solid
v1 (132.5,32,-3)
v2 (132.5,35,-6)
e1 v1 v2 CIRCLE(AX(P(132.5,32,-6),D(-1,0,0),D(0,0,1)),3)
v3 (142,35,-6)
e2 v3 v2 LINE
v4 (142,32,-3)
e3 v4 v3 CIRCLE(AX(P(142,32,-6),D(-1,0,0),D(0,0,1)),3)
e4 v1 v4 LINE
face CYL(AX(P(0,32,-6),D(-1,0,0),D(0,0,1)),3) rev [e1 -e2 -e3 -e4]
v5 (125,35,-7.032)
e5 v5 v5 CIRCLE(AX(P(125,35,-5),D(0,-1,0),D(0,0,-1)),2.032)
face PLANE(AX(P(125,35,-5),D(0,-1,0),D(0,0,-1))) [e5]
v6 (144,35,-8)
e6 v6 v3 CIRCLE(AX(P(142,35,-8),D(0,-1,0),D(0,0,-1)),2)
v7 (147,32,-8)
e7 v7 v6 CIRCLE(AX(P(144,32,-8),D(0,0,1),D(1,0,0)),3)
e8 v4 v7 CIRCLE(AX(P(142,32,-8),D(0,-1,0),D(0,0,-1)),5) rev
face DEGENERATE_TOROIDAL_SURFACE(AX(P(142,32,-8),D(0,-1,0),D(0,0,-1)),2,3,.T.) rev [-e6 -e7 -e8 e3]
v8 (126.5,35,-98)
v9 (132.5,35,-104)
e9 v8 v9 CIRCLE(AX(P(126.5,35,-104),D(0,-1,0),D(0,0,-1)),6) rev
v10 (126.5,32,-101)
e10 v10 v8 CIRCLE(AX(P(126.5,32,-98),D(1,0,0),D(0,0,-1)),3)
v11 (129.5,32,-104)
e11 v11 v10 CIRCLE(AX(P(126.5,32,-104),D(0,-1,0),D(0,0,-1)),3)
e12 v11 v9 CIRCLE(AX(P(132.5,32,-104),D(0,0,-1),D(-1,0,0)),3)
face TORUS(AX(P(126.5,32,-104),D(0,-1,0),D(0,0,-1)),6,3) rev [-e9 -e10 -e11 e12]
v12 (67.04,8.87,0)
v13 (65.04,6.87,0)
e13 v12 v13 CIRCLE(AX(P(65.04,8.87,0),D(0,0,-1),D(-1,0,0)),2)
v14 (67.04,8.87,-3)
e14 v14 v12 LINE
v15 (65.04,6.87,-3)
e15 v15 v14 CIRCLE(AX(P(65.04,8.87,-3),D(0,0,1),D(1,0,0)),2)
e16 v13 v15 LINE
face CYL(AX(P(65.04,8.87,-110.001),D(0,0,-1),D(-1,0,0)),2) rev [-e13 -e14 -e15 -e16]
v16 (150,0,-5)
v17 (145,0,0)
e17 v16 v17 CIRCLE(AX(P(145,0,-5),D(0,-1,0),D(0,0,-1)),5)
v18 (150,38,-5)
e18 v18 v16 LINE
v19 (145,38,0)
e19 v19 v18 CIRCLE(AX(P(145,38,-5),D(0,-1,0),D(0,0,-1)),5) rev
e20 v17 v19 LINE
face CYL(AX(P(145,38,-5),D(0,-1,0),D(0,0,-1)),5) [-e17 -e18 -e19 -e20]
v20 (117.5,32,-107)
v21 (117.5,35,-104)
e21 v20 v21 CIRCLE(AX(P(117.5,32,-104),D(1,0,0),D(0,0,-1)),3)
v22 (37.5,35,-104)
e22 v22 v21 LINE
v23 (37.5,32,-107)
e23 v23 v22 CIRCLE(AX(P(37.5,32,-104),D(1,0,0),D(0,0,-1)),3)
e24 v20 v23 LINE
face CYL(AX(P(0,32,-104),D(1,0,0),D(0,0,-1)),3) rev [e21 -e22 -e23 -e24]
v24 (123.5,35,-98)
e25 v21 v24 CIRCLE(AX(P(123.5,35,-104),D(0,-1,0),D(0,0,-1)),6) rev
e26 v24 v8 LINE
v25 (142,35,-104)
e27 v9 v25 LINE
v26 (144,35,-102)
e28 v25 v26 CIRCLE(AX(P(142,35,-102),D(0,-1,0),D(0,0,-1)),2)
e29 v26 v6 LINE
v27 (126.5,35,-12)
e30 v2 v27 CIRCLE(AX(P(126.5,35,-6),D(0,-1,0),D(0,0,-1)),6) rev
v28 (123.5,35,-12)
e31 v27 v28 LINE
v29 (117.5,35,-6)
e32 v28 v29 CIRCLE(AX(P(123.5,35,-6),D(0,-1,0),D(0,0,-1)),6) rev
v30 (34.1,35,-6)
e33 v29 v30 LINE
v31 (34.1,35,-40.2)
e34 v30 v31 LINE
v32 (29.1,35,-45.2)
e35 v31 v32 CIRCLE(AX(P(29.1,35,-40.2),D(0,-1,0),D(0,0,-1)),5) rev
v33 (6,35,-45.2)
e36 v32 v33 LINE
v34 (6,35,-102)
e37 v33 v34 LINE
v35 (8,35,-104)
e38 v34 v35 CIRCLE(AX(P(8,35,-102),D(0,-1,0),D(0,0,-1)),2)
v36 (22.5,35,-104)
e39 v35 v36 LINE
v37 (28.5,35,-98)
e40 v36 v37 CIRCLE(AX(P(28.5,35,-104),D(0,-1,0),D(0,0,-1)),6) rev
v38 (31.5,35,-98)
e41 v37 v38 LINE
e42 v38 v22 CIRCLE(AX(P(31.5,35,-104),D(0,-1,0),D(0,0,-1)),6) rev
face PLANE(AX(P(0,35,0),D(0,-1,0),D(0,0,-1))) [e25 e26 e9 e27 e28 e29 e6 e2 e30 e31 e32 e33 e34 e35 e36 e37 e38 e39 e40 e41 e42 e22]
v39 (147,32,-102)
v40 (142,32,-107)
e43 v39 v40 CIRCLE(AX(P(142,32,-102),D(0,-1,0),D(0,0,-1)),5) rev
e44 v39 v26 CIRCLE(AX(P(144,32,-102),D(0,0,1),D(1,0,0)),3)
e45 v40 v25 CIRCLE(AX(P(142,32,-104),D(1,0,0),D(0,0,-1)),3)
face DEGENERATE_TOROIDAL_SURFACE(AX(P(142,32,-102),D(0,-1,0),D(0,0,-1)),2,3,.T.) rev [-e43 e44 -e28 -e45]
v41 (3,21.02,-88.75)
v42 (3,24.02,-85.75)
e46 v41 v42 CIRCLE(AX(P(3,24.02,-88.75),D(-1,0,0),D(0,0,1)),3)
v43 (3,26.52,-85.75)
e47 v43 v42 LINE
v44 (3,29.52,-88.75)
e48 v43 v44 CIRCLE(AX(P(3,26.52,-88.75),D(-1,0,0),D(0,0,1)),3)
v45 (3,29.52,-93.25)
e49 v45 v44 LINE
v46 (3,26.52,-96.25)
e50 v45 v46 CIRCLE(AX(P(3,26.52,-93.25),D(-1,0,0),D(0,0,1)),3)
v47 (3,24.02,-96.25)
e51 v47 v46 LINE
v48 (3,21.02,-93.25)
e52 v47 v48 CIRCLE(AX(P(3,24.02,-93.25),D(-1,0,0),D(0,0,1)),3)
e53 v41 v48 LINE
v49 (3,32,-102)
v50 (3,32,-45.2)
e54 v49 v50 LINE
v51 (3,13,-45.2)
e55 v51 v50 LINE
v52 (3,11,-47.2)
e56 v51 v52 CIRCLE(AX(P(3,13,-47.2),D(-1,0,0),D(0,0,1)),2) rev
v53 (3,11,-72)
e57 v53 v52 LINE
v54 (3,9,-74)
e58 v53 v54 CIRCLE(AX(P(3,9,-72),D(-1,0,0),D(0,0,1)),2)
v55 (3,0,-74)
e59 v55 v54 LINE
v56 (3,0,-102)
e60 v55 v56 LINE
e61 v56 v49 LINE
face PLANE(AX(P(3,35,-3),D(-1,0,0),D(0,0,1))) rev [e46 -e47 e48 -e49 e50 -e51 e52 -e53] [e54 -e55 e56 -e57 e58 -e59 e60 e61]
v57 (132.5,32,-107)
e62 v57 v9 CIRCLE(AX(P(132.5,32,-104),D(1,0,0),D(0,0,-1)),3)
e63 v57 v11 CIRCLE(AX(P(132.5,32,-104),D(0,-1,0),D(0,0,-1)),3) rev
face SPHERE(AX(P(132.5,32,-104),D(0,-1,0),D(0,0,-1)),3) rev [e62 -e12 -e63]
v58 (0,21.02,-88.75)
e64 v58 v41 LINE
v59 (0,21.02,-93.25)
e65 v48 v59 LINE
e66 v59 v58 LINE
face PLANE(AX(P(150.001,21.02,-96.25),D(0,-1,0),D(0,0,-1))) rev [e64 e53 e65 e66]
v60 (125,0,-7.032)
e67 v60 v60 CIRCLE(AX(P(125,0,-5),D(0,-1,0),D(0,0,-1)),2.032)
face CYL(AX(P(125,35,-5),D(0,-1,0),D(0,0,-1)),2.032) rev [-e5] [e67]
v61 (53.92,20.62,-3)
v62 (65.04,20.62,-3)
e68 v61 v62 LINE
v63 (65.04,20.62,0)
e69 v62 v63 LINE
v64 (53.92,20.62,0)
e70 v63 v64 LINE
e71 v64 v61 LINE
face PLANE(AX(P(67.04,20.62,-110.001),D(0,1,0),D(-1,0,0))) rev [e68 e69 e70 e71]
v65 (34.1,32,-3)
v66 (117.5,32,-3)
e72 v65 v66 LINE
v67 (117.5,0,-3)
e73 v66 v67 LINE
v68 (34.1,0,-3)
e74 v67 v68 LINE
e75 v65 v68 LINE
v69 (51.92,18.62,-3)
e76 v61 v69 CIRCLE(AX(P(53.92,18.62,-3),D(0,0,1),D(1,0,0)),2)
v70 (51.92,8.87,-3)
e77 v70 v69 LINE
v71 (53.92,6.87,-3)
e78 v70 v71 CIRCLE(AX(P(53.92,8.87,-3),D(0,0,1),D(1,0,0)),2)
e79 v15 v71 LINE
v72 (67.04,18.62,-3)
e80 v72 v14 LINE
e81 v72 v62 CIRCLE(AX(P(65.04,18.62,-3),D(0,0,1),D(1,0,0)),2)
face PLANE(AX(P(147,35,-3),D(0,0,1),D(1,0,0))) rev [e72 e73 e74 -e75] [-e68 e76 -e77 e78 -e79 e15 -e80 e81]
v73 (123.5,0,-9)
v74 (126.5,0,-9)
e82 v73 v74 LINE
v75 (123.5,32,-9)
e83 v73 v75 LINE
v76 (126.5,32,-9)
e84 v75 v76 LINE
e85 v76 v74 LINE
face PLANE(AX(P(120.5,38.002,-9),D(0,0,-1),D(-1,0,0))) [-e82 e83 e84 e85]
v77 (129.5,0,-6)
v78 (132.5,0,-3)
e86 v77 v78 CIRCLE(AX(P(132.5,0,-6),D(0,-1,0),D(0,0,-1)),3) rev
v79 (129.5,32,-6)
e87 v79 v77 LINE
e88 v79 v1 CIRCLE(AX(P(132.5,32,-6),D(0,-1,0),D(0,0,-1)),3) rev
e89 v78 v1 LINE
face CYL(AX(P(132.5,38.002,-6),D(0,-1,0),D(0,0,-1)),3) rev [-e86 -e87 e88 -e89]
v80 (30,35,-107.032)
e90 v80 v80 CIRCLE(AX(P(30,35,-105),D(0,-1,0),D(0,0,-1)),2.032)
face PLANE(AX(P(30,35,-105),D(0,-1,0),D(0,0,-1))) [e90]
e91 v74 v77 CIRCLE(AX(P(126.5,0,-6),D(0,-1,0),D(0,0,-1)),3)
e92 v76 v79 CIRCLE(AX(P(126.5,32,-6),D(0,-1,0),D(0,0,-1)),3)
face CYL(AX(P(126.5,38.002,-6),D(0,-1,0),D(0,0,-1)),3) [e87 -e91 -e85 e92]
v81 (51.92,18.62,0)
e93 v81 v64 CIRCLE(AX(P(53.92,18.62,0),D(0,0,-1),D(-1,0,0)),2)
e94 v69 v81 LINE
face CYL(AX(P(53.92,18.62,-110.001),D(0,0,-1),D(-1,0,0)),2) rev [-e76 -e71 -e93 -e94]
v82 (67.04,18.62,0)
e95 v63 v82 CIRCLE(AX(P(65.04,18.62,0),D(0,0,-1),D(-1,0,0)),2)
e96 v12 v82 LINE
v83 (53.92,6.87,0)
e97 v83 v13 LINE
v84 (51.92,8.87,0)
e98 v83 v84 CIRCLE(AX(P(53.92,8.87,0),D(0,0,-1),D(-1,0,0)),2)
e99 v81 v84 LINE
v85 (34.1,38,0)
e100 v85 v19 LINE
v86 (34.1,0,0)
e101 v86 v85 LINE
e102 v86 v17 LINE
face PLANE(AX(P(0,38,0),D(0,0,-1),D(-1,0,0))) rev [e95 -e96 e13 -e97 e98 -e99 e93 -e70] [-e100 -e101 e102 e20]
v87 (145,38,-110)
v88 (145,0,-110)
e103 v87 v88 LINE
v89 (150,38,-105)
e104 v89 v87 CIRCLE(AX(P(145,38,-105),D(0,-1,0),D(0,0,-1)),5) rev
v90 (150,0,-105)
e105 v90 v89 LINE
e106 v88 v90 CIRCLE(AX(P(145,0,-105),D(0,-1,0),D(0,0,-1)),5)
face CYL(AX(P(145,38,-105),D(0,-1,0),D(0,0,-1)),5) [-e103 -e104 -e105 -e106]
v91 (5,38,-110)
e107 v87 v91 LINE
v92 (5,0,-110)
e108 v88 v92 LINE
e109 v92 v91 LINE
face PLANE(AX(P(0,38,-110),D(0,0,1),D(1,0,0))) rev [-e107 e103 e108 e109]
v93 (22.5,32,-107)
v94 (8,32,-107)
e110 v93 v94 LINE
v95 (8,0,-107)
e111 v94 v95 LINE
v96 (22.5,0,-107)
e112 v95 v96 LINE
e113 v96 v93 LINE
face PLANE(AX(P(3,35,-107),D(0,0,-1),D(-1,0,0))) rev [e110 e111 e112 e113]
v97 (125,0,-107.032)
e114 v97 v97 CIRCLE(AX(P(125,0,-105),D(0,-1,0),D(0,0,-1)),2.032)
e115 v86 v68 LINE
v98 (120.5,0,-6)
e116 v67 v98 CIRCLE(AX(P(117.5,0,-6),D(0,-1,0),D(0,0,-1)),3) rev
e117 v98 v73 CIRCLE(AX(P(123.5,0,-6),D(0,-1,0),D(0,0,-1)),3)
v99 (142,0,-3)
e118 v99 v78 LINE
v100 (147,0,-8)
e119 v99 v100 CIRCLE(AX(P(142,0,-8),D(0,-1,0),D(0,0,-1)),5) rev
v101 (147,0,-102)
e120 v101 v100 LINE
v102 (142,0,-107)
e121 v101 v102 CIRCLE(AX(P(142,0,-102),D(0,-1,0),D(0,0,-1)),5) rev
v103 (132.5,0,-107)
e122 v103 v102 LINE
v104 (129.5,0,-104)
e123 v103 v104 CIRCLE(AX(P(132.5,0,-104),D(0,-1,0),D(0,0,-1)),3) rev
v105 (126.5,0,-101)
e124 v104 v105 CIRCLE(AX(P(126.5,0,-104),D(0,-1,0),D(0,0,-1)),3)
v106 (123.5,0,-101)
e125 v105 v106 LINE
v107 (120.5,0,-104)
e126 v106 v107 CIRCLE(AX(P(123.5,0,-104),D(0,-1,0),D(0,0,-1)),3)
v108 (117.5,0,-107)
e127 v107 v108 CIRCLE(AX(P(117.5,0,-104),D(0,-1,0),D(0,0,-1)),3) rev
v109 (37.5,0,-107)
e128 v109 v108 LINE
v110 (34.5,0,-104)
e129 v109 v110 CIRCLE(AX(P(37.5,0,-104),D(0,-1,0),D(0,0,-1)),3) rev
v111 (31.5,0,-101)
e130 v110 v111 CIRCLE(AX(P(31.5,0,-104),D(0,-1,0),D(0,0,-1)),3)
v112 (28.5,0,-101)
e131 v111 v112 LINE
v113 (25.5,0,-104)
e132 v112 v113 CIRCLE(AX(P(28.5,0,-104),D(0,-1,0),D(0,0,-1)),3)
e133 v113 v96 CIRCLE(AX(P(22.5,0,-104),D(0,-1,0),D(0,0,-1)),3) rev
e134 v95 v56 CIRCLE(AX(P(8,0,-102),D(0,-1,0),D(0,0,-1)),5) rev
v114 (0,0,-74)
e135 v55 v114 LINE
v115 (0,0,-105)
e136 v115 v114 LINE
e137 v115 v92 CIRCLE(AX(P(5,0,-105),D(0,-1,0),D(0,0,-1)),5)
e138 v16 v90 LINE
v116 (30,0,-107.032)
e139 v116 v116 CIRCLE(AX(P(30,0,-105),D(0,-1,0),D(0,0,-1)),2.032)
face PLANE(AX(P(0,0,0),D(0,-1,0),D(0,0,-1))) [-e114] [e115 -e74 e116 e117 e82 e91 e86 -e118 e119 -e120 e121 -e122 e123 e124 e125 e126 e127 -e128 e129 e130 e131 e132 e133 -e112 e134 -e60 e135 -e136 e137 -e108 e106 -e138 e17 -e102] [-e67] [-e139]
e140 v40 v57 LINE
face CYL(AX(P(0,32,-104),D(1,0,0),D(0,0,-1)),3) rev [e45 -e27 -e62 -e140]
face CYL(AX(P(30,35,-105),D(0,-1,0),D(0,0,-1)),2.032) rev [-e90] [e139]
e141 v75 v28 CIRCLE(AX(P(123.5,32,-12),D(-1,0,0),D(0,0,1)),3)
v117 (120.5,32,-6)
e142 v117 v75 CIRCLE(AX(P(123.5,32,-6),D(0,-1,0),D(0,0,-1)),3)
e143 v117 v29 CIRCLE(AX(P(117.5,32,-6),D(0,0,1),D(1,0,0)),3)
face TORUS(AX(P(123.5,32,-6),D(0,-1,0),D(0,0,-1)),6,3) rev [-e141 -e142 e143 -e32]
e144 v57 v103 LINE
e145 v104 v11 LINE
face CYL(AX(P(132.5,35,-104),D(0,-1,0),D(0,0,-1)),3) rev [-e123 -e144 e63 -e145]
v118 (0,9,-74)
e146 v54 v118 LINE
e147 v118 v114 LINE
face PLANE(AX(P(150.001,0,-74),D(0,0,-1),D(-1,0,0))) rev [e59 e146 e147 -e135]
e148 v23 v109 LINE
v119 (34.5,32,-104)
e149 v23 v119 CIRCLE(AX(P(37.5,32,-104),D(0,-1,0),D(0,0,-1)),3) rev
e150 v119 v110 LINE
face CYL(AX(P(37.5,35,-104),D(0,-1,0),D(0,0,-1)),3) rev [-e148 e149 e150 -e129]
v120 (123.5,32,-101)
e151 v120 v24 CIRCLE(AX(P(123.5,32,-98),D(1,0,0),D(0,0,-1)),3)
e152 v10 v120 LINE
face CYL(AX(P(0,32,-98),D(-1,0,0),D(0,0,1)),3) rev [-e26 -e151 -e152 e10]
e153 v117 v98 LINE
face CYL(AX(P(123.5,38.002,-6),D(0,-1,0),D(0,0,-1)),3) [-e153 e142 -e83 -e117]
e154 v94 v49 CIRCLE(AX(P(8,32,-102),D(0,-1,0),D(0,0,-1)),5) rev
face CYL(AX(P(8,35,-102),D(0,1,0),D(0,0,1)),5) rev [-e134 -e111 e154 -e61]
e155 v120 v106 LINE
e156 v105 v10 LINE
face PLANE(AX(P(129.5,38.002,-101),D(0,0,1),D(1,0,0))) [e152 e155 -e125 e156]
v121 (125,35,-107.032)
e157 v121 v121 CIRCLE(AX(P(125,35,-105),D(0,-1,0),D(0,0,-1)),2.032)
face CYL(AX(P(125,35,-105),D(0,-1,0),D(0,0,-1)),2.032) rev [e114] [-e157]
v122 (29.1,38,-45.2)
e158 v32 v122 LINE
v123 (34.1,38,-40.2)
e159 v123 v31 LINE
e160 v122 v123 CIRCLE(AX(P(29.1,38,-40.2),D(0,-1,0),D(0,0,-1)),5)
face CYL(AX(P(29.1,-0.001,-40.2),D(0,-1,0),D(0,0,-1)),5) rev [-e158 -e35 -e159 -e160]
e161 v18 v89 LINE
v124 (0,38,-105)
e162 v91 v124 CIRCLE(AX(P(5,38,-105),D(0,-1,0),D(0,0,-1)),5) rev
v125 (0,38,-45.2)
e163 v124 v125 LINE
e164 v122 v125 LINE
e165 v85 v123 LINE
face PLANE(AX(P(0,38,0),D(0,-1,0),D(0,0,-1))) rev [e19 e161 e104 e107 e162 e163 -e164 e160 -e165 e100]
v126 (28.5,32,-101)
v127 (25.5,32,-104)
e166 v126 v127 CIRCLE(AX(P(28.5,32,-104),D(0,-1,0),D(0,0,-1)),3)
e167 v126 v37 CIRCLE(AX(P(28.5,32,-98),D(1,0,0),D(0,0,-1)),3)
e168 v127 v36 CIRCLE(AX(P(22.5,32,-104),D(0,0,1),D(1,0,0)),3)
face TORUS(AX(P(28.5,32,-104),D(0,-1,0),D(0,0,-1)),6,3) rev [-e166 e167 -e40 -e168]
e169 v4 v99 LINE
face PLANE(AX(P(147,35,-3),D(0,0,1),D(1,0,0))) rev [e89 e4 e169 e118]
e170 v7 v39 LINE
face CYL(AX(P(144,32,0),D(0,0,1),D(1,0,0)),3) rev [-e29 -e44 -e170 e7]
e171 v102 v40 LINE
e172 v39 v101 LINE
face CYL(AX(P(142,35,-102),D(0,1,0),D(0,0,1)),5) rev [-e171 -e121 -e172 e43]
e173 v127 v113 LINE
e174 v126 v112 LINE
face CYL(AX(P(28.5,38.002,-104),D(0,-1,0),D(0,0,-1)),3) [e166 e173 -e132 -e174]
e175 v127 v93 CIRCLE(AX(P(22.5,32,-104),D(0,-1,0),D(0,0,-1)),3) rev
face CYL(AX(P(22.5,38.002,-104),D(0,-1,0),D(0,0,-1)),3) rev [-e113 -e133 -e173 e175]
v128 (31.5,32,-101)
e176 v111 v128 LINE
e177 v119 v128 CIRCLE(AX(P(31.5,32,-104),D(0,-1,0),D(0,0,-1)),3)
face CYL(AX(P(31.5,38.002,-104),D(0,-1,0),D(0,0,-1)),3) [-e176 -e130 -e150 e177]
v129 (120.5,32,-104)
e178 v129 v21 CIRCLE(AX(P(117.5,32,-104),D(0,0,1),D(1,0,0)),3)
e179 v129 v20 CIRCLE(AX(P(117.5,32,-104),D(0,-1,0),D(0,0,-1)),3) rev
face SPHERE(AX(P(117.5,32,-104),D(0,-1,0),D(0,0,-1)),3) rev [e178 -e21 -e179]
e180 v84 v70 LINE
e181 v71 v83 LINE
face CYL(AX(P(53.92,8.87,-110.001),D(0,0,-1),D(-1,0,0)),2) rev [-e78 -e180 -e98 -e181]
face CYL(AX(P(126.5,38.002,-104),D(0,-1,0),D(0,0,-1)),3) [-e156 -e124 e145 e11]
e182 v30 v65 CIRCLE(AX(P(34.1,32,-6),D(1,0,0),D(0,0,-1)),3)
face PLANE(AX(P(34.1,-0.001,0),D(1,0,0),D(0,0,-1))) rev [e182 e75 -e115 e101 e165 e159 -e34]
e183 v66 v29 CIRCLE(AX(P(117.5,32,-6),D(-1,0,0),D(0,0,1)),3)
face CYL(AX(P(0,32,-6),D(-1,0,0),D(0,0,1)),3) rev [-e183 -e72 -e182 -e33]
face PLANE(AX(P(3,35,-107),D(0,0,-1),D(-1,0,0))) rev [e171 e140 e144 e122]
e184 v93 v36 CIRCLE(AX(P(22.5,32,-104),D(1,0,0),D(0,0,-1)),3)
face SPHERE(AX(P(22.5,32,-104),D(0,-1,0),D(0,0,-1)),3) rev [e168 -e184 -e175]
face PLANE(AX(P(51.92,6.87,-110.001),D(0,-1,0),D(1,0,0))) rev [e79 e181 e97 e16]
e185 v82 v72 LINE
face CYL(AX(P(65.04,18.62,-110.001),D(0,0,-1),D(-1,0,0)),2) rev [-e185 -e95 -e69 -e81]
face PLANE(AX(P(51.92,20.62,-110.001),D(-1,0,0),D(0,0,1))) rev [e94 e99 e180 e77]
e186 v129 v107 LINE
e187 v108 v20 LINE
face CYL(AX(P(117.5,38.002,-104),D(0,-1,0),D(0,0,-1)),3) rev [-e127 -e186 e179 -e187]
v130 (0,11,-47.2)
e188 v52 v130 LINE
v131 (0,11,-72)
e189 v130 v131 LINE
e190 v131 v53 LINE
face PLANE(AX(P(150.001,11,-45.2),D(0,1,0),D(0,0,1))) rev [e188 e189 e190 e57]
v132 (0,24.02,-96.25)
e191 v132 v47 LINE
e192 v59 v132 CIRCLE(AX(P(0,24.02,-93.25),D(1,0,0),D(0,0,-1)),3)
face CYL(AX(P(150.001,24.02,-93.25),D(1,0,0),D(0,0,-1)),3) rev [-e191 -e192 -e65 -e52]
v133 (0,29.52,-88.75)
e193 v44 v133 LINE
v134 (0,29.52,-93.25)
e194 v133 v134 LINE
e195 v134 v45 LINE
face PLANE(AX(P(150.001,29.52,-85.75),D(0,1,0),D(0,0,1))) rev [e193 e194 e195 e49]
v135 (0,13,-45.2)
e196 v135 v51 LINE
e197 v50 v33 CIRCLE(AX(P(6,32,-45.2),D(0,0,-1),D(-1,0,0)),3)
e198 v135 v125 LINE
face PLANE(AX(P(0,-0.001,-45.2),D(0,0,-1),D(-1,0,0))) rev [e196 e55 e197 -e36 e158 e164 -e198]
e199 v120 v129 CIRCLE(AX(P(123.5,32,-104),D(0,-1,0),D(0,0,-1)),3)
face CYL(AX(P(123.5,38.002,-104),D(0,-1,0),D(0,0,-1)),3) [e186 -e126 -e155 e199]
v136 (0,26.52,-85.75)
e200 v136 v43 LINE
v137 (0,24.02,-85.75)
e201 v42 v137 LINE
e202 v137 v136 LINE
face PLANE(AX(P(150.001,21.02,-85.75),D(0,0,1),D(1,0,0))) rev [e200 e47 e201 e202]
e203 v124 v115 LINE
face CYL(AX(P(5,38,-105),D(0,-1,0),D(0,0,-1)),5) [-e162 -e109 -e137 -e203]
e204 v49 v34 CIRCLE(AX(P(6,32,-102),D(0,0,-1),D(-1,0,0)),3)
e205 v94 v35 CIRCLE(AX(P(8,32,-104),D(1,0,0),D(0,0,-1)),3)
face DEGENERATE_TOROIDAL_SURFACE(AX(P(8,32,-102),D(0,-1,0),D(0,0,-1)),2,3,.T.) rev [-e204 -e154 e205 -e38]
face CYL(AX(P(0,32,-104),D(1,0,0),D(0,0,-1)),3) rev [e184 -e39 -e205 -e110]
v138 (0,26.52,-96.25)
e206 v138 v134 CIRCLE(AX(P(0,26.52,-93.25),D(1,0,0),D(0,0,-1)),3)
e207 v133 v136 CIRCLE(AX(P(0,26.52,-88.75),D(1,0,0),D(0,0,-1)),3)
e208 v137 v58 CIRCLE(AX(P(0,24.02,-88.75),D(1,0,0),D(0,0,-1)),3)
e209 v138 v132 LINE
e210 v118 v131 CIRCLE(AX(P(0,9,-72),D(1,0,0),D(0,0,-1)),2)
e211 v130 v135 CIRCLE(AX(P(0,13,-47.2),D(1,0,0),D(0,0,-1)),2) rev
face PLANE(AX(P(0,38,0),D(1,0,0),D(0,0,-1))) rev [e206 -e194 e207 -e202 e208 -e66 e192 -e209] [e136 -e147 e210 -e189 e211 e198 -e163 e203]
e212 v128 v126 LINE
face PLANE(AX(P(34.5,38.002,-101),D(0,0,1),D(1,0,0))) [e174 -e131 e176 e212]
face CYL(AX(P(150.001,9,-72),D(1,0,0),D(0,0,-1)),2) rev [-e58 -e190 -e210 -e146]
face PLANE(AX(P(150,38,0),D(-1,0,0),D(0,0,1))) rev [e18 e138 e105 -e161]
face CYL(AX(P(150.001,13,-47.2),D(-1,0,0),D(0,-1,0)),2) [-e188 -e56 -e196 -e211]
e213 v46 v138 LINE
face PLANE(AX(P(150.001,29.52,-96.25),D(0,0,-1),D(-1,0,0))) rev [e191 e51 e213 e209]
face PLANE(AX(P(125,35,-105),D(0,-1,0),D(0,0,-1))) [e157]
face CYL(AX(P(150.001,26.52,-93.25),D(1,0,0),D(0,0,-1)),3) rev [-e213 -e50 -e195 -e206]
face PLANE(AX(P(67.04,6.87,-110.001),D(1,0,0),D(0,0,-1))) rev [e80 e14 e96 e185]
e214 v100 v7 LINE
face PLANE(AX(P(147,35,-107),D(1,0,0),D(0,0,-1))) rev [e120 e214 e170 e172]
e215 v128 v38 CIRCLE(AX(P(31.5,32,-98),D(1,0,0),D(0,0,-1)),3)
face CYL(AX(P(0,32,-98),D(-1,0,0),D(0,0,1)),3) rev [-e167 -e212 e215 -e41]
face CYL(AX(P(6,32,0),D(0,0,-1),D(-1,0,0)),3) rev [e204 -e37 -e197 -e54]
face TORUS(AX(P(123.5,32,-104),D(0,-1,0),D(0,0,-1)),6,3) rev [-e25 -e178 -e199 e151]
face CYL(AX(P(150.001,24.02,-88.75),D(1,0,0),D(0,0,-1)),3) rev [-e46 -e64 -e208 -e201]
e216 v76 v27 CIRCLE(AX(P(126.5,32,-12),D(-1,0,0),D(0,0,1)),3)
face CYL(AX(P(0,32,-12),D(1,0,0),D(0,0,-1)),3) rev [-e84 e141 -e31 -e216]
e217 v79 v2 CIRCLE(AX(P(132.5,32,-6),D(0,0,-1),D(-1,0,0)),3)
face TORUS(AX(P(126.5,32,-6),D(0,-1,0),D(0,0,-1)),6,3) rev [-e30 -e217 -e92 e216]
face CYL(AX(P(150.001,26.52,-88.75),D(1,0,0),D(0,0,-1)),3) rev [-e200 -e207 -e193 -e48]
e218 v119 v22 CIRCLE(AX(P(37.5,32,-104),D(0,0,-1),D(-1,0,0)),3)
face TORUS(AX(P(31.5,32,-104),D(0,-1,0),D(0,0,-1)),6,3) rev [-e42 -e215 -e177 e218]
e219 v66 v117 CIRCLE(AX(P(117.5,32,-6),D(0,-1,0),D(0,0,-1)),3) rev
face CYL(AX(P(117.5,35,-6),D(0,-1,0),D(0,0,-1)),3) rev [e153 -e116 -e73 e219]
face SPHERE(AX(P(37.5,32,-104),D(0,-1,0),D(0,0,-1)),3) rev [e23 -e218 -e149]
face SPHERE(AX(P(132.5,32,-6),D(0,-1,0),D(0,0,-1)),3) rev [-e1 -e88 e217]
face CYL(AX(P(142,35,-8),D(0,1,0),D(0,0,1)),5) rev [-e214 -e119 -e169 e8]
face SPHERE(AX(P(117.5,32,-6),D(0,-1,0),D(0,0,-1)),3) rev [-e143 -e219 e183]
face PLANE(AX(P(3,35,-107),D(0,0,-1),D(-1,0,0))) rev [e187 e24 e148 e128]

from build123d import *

# Parameters (mm, degrees)
SKETCH1_W           = 150
SKETCH1_H           = 110
BOSS_EXTRUDE1_DEPTH = 38
SKETCH3_W           = 144
SKETCH3_H           = 104
CUT_EXTRUDE1_DEPTH  = 35
CUT_EXTRUDE2_REACH  = 191.853
SKETCH5_W           = 10.5
SKETCH5_H           = 8.5
FILLET4_R           = 3
CUT_EXTRUDE3_REACH  = 191.853
SKETCH6_W           = 34.1
SKETCH6_H           = 45.2
CUT_EXTRUDE4_REACH  = 191.853
SKETCH10_W          = 15.12
SKETCH10_H          = 13.75
FILLET5_R           = 2
BOSS_EXTRUDE2_REACH = 191.853
SKETCH12_W          = 9
SKETCH12_H          = 6
SKETCH13_R          = 2.032
CUT_EXTRUDE5_DEPTH  = 35
CUT_EXTRUDE6_REACH  = 191.853
SKETCH14_W          = 28.8
SKETCH14_H          = 11
FILLET6_R           = 5
FILLET7_R           = 2
FILLET8_DEPTH       = 35
FILLET8_2_DEPTH     = 36
FILLET9_R           = 3


with BuildPart() as part:
    # Sketch1 → Boss-Extrude1 (new body)
    with BuildSketch(Plane(origin=(0, 0, 0), x_dir=(1, 0, 0), z_dir=(0, 1, 0))):
        with Locations((75, 55)):
            Rectangle(SKETCH1_W, SKETCH1_H)
    extrude(amount=BOSS_EXTRUDE1_DEPTH)

    # Sketch3 → Cut-Extrude1 (cut)
    with BuildSketch(Plane.XZ):
        with Locations((75, -55)):
            Rectangle(SKETCH3_W, SKETCH3_H)
    extrude(amount=-CUT_EXTRUDE1_DEPTH, mode=Mode.SUBTRACT)

    # Sketch5 → Cut-Extrude2 (cut, up to next)
    with BuildSketch(Plane.ZY, mode=Mode.PRIVATE) as cut_extrude2_sk1:
        with Locations((-91, 25.27)):
            Rectangle(SKETCH5_W, SKETCH5_H)
    cut_extrude2_tool1 = extrude(cut_extrude2_sk1.sketch, amount=-CUT_EXTRUDE2_REACH, mode=Mode.PRIVATE) & part.part
    add(cut_extrude2_tool1.solids().sort_by_distance((0, 25.27, -91))[0], mode=Mode.SUBTRACT)

    # Fillet4
    fillet4_edges = [part.edges().sort_by_distance(p)[0] for p in [
        (1.5, 21.02, -85.75),
        (1.5, 29.52, -85.75),
        (1.5, 29.52, -96.25),
        (1.5, 21.02, -96.25),
    ]]
    fillet(fillet4_edges, radius=FILLET4_R)

    # Sketch6 → Cut-Extrude3 (cut, up to next)
    with BuildSketch(Plane(origin=(0, 38, 0), x_dir=(1, 0, 0), z_dir=(0, 1, 0)), mode=Mode.PRIVATE) as cut_extrude3_sk1:
        with Locations((17.05, 22.6)):
            Rectangle(SKETCH6_W, SKETCH6_H)
    cut_extrude3_tool1 = extrude(cut_extrude3_sk1.sketch, amount=-CUT_EXTRUDE3_REACH, mode=Mode.PRIVATE) & part.part
    add(cut_extrude3_tool1.solids().sort_by_distance((17.05, 38, -22.6))[0], mode=Mode.SUBTRACT)

    # Sketch10 → Cut-Extrude4 (cut, up to next)
    with BuildSketch(Plane.XY, mode=Mode.PRIVATE) as cut_extrude4_sk1:
        with Locations((59.48, 13.745)):
            Rectangle(SKETCH10_W, SKETCH10_H)
    cut_extrude4_tool1 = extrude(cut_extrude4_sk1.sketch, amount=-CUT_EXTRUDE4_REACH, mode=Mode.PRIVATE) & part.part
    add(cut_extrude4_tool1.solids().sort_by_distance((59.48, 13.745, 0))[0], mode=Mode.SUBTRACT)

    # Fillet5
    fillet5_edges = [part.edges().sort_by_distance(p)[0] for p in [
        (51.92, 6.87, -1.5),
        (51.92, 20.62, -1.5),
        (67.04, 20.62, -1.5),
        (67.04, 6.87, -1.5),
    ]]
    fillet(fillet5_edges, radius=FILLET5_R)

    # Sketch12 → Boss-Extrude2 (add, up to next)
    with BuildSketch(Plane.XZ, mode=Mode.PRIVATE) as boss_extrude2_sk1:
        with Locations((125, -6)):
            Rectangle(SKETCH12_W, SKETCH12_H)
    boss_extrude2_tool1 = extrude(boss_extrude2_sk1.sketch, amount=-BOSS_EXTRUDE2_REACH, mode=Mode.PRIVATE) - part.part
    # Sketch12 → Boss-Extrude2 (add, up to next)
    with BuildSketch(Plane.XZ, mode=Mode.PRIVATE) as boss_extrude2_sk2:
        with Locations((30, -104)):
            Rectangle(SKETCH12_W, SKETCH12_H)
    boss_extrude2_tool2 = extrude(boss_extrude2_sk2.sketch, amount=-BOSS_EXTRUDE2_REACH, mode=Mode.PRIVATE) - part.part
    # Sketch12 → Boss-Extrude2 (add, up to next)
    with BuildSketch(Plane.XZ, mode=Mode.PRIVATE) as boss_extrude2_sk3:
        with Locations((125, -104)):
            Rectangle(SKETCH12_W, SKETCH12_H)
    boss_extrude2_tool3 = extrude(boss_extrude2_sk3.sketch, amount=-BOSS_EXTRUDE2_REACH, mode=Mode.PRIVATE) - part.part
    add(boss_extrude2_tool1.solids().sort_by_distance((125, 0, -6))[0])
    add(boss_extrude2_tool2.solids().sort_by_distance((30, 0, -104))[0])
    add(boss_extrude2_tool3.solids().sort_by_distance((125, 0, -104))[0])

    # Sketch13 → Cut-Extrude5 (cut)
    with BuildSketch(Plane.XZ):
        with Locations(Location((125, -5, 0), (0, 0, 270))):
            Circle(SKETCH13_R)
        with Locations(Location((125, -105, 0), (0, 0, 270))):
            Circle(SKETCH13_R)
        with Locations(Location((30, -105, 0), (0, 0, 270))):
            Circle(SKETCH13_R)
    extrude(amount=-CUT_EXTRUDE5_DEPTH, mode=Mode.SUBTRACT)

    # Sketch14 → Cut-Extrude6 (cut, up to next)
    with BuildSketch(Plane.ZY, mode=Mode.PRIVATE) as cut_extrude6_sk1:
        with Locations((-59.6, 5.5)):
            Rectangle(SKETCH14_W, SKETCH14_H)
    cut_extrude6_tool1 = extrude(cut_extrude6_sk1.sketch, amount=-CUT_EXTRUDE6_REACH, mode=Mode.PRIVATE) & part.part
    add(cut_extrude6_tool1.solids().sort_by_distance((0, 5.5, -59.6))[0], mode=Mode.SUBTRACT)

    # Fillet6
    fillet6_edges = [part.edges().sort_by_distance(p)[0] for p in [
        (147, 17.5, -3),
        (147, 17.5, -107),
        (3, 17.5, -107),
        (34.1, 36.5, -45.2),
        (0, 19, -110),
        (150, 19, -110),
        (150, 19, 0),
    ]]
    fillet(fillet6_edges, radius=FILLET6_R)

    # Fillet7
    fillet7_edges = [part.edges().sort_by_distance(p)[0] for p in [
        (1.5, 11, -74),
        (1.5, 11, -45.2),
    ]]
    fillet(fillet7_edges, radius=FILLET7_R)

    # Fillet8: read off the stored shape, not the designer's step
    # Fillet8 outline → Fillet8 (cut)
    with BuildSketch(Plane(origin=(0, 0, 0), x_dir=(1, 0, 0), z_dir=(0, 1, 0))):
        with BuildLine():
            Line((129.5, 101), (129.5, 104))
            ThreePointArc((129.5, 104), (128.621320344, 101.878679656), (126.5, 101))
            Line((126.5, 101), (129.5, 101))
        make_face()
        with BuildLine():
            Line((25.5, 101), (28.5, 101))
            ThreePointArc((28.5, 101), (26.378679656, 101.878679656), (25.5, 104))
            Line((25.5, 104), (25.5, 101))
        make_face()
        with BuildLine():
            Line((34.5, 101), (34.5, 104))
            ThreePointArc((34.5, 104), (33.621320344, 101.878679656), (31.5, 101))
            Line((31.5, 101), (34.5, 101))
        make_face()
        with BuildLine():
            Line((120.5, 101), (123.5, 101))
            ThreePointArc((123.5, 101), (121.378679656, 101.878679656), (120.5, 104))
            Line((120.5, 104), (120.5, 101))
        make_face()
        with BuildLine():
            Line((120.5, 9), (120.5, 6))
            ThreePointArc((120.5, 6), (121.378679656, 8.121320344), (123.5, 9))
            Line((123.5, 9), (120.5, 9))
        make_face()
        with BuildLine():
            Line((129.5, 9), (126.5, 9))
            ThreePointArc((126.5, 9), (128.621320344, 8.121320344), (129.5, 6))
            Line((129.5, 6), (129.5, 9))
        make_face()
    extrude(amount=FILLET8_DEPTH, mode=Mode.SUBTRACT)

    # Fillet8 2 outline → Fillet8 2 (add)
    with BuildSketch(Plane(origin=(0, 0, 0), x_dir=(1, 0, 0), z_dir=(0, 1, 0))):
        with BuildLine():
            Line((129.5, 107), (129.5, 104))
            ThreePointArc((129.5, 104), (130.378679656, 106.121320344), (132.5, 107))
            Line((132.5, 107), (129.5, 107))
        make_face()
        with BuildLine():
            ThreePointArc((22.5, 107), (24.621320344, 106.121320344), (25.5, 104))
            Line((25.5, 104), (25.5, 107))
            Line((25.5, 107), (22.5, 107))
        make_face()
        with BuildLine():
            ThreePointArc((34.5, 104), (35.378679656, 106.121320344), (37.5, 107))
            Line((37.5, 107), (34.5, 107))
            Line((34.5, 107), (34.5, 104))
        make_face()
        with BuildLine():
            ThreePointArc((117.5, 107), (119.621320344, 106.121320344), (120.5, 104))
            Line((120.5, 104), (120.5, 107))
            Line((120.5, 107), (117.5, 107))
        make_face()
        with BuildLine():
            Line((120.5, 3), (120.5, 6))
            ThreePointArc((120.5, 6), (119.621320344, 3.878679656), (117.5, 3))
            Line((117.5, 3), (120.5, 3))
        make_face()
        with BuildLine():
            ThreePointArc((132.5, 3), (130.378679656, 3.878679656), (129.5, 6))
            Line((129.5, 6), (129.5, 3))
            Line((129.5, 3), (132.5, 3))
        make_face()
    extrude(amount=FILLET8_2_DEPTH)

    # Fillet9
    fillet9_edges = [part.edges().sort_by_distance(p)[0] for p in [
        (147, 35, -55),
        (137.25, 35, -3),
        (15.25, 35, -107),
        (4.464466094, 35, -105.535533906),
        (145.535533906, 35, -4.464466094),
        (145.535533906, 35, -105.535533906),
        (125, 35, -101),
        (77.5, 35, -107),
        (137.25, 35, -107),
        (125, 35, -9),
        (75.8, 35, -3),
        (30, 35, -101),
        (24.621320344, 35, -106.121320344),
        (130.378679656, 35, -106.121320344),
        (130.378679656, 35, -3.878679656),
        (119.621320344, 35, -3.878679656),
        (35.378679656, 35, -106.121320344),
        (119.621320344, 35, -106.121320344),
        (128.621320344, 35, -101.878679656),
        (121.378679656, 35, -101.878679656),
        (33.621320344, 35, -101.878679656),
        (121.378679656, 35, -8.121320344),
        (128.621320344, 35, -8.121320344),
        (26.378679656, 35, -101.878679656),
        (3, 35, -73.6),
    ]]
    fillet(fillet9_edges, radius=FILLET9_R)


solid = part.part
